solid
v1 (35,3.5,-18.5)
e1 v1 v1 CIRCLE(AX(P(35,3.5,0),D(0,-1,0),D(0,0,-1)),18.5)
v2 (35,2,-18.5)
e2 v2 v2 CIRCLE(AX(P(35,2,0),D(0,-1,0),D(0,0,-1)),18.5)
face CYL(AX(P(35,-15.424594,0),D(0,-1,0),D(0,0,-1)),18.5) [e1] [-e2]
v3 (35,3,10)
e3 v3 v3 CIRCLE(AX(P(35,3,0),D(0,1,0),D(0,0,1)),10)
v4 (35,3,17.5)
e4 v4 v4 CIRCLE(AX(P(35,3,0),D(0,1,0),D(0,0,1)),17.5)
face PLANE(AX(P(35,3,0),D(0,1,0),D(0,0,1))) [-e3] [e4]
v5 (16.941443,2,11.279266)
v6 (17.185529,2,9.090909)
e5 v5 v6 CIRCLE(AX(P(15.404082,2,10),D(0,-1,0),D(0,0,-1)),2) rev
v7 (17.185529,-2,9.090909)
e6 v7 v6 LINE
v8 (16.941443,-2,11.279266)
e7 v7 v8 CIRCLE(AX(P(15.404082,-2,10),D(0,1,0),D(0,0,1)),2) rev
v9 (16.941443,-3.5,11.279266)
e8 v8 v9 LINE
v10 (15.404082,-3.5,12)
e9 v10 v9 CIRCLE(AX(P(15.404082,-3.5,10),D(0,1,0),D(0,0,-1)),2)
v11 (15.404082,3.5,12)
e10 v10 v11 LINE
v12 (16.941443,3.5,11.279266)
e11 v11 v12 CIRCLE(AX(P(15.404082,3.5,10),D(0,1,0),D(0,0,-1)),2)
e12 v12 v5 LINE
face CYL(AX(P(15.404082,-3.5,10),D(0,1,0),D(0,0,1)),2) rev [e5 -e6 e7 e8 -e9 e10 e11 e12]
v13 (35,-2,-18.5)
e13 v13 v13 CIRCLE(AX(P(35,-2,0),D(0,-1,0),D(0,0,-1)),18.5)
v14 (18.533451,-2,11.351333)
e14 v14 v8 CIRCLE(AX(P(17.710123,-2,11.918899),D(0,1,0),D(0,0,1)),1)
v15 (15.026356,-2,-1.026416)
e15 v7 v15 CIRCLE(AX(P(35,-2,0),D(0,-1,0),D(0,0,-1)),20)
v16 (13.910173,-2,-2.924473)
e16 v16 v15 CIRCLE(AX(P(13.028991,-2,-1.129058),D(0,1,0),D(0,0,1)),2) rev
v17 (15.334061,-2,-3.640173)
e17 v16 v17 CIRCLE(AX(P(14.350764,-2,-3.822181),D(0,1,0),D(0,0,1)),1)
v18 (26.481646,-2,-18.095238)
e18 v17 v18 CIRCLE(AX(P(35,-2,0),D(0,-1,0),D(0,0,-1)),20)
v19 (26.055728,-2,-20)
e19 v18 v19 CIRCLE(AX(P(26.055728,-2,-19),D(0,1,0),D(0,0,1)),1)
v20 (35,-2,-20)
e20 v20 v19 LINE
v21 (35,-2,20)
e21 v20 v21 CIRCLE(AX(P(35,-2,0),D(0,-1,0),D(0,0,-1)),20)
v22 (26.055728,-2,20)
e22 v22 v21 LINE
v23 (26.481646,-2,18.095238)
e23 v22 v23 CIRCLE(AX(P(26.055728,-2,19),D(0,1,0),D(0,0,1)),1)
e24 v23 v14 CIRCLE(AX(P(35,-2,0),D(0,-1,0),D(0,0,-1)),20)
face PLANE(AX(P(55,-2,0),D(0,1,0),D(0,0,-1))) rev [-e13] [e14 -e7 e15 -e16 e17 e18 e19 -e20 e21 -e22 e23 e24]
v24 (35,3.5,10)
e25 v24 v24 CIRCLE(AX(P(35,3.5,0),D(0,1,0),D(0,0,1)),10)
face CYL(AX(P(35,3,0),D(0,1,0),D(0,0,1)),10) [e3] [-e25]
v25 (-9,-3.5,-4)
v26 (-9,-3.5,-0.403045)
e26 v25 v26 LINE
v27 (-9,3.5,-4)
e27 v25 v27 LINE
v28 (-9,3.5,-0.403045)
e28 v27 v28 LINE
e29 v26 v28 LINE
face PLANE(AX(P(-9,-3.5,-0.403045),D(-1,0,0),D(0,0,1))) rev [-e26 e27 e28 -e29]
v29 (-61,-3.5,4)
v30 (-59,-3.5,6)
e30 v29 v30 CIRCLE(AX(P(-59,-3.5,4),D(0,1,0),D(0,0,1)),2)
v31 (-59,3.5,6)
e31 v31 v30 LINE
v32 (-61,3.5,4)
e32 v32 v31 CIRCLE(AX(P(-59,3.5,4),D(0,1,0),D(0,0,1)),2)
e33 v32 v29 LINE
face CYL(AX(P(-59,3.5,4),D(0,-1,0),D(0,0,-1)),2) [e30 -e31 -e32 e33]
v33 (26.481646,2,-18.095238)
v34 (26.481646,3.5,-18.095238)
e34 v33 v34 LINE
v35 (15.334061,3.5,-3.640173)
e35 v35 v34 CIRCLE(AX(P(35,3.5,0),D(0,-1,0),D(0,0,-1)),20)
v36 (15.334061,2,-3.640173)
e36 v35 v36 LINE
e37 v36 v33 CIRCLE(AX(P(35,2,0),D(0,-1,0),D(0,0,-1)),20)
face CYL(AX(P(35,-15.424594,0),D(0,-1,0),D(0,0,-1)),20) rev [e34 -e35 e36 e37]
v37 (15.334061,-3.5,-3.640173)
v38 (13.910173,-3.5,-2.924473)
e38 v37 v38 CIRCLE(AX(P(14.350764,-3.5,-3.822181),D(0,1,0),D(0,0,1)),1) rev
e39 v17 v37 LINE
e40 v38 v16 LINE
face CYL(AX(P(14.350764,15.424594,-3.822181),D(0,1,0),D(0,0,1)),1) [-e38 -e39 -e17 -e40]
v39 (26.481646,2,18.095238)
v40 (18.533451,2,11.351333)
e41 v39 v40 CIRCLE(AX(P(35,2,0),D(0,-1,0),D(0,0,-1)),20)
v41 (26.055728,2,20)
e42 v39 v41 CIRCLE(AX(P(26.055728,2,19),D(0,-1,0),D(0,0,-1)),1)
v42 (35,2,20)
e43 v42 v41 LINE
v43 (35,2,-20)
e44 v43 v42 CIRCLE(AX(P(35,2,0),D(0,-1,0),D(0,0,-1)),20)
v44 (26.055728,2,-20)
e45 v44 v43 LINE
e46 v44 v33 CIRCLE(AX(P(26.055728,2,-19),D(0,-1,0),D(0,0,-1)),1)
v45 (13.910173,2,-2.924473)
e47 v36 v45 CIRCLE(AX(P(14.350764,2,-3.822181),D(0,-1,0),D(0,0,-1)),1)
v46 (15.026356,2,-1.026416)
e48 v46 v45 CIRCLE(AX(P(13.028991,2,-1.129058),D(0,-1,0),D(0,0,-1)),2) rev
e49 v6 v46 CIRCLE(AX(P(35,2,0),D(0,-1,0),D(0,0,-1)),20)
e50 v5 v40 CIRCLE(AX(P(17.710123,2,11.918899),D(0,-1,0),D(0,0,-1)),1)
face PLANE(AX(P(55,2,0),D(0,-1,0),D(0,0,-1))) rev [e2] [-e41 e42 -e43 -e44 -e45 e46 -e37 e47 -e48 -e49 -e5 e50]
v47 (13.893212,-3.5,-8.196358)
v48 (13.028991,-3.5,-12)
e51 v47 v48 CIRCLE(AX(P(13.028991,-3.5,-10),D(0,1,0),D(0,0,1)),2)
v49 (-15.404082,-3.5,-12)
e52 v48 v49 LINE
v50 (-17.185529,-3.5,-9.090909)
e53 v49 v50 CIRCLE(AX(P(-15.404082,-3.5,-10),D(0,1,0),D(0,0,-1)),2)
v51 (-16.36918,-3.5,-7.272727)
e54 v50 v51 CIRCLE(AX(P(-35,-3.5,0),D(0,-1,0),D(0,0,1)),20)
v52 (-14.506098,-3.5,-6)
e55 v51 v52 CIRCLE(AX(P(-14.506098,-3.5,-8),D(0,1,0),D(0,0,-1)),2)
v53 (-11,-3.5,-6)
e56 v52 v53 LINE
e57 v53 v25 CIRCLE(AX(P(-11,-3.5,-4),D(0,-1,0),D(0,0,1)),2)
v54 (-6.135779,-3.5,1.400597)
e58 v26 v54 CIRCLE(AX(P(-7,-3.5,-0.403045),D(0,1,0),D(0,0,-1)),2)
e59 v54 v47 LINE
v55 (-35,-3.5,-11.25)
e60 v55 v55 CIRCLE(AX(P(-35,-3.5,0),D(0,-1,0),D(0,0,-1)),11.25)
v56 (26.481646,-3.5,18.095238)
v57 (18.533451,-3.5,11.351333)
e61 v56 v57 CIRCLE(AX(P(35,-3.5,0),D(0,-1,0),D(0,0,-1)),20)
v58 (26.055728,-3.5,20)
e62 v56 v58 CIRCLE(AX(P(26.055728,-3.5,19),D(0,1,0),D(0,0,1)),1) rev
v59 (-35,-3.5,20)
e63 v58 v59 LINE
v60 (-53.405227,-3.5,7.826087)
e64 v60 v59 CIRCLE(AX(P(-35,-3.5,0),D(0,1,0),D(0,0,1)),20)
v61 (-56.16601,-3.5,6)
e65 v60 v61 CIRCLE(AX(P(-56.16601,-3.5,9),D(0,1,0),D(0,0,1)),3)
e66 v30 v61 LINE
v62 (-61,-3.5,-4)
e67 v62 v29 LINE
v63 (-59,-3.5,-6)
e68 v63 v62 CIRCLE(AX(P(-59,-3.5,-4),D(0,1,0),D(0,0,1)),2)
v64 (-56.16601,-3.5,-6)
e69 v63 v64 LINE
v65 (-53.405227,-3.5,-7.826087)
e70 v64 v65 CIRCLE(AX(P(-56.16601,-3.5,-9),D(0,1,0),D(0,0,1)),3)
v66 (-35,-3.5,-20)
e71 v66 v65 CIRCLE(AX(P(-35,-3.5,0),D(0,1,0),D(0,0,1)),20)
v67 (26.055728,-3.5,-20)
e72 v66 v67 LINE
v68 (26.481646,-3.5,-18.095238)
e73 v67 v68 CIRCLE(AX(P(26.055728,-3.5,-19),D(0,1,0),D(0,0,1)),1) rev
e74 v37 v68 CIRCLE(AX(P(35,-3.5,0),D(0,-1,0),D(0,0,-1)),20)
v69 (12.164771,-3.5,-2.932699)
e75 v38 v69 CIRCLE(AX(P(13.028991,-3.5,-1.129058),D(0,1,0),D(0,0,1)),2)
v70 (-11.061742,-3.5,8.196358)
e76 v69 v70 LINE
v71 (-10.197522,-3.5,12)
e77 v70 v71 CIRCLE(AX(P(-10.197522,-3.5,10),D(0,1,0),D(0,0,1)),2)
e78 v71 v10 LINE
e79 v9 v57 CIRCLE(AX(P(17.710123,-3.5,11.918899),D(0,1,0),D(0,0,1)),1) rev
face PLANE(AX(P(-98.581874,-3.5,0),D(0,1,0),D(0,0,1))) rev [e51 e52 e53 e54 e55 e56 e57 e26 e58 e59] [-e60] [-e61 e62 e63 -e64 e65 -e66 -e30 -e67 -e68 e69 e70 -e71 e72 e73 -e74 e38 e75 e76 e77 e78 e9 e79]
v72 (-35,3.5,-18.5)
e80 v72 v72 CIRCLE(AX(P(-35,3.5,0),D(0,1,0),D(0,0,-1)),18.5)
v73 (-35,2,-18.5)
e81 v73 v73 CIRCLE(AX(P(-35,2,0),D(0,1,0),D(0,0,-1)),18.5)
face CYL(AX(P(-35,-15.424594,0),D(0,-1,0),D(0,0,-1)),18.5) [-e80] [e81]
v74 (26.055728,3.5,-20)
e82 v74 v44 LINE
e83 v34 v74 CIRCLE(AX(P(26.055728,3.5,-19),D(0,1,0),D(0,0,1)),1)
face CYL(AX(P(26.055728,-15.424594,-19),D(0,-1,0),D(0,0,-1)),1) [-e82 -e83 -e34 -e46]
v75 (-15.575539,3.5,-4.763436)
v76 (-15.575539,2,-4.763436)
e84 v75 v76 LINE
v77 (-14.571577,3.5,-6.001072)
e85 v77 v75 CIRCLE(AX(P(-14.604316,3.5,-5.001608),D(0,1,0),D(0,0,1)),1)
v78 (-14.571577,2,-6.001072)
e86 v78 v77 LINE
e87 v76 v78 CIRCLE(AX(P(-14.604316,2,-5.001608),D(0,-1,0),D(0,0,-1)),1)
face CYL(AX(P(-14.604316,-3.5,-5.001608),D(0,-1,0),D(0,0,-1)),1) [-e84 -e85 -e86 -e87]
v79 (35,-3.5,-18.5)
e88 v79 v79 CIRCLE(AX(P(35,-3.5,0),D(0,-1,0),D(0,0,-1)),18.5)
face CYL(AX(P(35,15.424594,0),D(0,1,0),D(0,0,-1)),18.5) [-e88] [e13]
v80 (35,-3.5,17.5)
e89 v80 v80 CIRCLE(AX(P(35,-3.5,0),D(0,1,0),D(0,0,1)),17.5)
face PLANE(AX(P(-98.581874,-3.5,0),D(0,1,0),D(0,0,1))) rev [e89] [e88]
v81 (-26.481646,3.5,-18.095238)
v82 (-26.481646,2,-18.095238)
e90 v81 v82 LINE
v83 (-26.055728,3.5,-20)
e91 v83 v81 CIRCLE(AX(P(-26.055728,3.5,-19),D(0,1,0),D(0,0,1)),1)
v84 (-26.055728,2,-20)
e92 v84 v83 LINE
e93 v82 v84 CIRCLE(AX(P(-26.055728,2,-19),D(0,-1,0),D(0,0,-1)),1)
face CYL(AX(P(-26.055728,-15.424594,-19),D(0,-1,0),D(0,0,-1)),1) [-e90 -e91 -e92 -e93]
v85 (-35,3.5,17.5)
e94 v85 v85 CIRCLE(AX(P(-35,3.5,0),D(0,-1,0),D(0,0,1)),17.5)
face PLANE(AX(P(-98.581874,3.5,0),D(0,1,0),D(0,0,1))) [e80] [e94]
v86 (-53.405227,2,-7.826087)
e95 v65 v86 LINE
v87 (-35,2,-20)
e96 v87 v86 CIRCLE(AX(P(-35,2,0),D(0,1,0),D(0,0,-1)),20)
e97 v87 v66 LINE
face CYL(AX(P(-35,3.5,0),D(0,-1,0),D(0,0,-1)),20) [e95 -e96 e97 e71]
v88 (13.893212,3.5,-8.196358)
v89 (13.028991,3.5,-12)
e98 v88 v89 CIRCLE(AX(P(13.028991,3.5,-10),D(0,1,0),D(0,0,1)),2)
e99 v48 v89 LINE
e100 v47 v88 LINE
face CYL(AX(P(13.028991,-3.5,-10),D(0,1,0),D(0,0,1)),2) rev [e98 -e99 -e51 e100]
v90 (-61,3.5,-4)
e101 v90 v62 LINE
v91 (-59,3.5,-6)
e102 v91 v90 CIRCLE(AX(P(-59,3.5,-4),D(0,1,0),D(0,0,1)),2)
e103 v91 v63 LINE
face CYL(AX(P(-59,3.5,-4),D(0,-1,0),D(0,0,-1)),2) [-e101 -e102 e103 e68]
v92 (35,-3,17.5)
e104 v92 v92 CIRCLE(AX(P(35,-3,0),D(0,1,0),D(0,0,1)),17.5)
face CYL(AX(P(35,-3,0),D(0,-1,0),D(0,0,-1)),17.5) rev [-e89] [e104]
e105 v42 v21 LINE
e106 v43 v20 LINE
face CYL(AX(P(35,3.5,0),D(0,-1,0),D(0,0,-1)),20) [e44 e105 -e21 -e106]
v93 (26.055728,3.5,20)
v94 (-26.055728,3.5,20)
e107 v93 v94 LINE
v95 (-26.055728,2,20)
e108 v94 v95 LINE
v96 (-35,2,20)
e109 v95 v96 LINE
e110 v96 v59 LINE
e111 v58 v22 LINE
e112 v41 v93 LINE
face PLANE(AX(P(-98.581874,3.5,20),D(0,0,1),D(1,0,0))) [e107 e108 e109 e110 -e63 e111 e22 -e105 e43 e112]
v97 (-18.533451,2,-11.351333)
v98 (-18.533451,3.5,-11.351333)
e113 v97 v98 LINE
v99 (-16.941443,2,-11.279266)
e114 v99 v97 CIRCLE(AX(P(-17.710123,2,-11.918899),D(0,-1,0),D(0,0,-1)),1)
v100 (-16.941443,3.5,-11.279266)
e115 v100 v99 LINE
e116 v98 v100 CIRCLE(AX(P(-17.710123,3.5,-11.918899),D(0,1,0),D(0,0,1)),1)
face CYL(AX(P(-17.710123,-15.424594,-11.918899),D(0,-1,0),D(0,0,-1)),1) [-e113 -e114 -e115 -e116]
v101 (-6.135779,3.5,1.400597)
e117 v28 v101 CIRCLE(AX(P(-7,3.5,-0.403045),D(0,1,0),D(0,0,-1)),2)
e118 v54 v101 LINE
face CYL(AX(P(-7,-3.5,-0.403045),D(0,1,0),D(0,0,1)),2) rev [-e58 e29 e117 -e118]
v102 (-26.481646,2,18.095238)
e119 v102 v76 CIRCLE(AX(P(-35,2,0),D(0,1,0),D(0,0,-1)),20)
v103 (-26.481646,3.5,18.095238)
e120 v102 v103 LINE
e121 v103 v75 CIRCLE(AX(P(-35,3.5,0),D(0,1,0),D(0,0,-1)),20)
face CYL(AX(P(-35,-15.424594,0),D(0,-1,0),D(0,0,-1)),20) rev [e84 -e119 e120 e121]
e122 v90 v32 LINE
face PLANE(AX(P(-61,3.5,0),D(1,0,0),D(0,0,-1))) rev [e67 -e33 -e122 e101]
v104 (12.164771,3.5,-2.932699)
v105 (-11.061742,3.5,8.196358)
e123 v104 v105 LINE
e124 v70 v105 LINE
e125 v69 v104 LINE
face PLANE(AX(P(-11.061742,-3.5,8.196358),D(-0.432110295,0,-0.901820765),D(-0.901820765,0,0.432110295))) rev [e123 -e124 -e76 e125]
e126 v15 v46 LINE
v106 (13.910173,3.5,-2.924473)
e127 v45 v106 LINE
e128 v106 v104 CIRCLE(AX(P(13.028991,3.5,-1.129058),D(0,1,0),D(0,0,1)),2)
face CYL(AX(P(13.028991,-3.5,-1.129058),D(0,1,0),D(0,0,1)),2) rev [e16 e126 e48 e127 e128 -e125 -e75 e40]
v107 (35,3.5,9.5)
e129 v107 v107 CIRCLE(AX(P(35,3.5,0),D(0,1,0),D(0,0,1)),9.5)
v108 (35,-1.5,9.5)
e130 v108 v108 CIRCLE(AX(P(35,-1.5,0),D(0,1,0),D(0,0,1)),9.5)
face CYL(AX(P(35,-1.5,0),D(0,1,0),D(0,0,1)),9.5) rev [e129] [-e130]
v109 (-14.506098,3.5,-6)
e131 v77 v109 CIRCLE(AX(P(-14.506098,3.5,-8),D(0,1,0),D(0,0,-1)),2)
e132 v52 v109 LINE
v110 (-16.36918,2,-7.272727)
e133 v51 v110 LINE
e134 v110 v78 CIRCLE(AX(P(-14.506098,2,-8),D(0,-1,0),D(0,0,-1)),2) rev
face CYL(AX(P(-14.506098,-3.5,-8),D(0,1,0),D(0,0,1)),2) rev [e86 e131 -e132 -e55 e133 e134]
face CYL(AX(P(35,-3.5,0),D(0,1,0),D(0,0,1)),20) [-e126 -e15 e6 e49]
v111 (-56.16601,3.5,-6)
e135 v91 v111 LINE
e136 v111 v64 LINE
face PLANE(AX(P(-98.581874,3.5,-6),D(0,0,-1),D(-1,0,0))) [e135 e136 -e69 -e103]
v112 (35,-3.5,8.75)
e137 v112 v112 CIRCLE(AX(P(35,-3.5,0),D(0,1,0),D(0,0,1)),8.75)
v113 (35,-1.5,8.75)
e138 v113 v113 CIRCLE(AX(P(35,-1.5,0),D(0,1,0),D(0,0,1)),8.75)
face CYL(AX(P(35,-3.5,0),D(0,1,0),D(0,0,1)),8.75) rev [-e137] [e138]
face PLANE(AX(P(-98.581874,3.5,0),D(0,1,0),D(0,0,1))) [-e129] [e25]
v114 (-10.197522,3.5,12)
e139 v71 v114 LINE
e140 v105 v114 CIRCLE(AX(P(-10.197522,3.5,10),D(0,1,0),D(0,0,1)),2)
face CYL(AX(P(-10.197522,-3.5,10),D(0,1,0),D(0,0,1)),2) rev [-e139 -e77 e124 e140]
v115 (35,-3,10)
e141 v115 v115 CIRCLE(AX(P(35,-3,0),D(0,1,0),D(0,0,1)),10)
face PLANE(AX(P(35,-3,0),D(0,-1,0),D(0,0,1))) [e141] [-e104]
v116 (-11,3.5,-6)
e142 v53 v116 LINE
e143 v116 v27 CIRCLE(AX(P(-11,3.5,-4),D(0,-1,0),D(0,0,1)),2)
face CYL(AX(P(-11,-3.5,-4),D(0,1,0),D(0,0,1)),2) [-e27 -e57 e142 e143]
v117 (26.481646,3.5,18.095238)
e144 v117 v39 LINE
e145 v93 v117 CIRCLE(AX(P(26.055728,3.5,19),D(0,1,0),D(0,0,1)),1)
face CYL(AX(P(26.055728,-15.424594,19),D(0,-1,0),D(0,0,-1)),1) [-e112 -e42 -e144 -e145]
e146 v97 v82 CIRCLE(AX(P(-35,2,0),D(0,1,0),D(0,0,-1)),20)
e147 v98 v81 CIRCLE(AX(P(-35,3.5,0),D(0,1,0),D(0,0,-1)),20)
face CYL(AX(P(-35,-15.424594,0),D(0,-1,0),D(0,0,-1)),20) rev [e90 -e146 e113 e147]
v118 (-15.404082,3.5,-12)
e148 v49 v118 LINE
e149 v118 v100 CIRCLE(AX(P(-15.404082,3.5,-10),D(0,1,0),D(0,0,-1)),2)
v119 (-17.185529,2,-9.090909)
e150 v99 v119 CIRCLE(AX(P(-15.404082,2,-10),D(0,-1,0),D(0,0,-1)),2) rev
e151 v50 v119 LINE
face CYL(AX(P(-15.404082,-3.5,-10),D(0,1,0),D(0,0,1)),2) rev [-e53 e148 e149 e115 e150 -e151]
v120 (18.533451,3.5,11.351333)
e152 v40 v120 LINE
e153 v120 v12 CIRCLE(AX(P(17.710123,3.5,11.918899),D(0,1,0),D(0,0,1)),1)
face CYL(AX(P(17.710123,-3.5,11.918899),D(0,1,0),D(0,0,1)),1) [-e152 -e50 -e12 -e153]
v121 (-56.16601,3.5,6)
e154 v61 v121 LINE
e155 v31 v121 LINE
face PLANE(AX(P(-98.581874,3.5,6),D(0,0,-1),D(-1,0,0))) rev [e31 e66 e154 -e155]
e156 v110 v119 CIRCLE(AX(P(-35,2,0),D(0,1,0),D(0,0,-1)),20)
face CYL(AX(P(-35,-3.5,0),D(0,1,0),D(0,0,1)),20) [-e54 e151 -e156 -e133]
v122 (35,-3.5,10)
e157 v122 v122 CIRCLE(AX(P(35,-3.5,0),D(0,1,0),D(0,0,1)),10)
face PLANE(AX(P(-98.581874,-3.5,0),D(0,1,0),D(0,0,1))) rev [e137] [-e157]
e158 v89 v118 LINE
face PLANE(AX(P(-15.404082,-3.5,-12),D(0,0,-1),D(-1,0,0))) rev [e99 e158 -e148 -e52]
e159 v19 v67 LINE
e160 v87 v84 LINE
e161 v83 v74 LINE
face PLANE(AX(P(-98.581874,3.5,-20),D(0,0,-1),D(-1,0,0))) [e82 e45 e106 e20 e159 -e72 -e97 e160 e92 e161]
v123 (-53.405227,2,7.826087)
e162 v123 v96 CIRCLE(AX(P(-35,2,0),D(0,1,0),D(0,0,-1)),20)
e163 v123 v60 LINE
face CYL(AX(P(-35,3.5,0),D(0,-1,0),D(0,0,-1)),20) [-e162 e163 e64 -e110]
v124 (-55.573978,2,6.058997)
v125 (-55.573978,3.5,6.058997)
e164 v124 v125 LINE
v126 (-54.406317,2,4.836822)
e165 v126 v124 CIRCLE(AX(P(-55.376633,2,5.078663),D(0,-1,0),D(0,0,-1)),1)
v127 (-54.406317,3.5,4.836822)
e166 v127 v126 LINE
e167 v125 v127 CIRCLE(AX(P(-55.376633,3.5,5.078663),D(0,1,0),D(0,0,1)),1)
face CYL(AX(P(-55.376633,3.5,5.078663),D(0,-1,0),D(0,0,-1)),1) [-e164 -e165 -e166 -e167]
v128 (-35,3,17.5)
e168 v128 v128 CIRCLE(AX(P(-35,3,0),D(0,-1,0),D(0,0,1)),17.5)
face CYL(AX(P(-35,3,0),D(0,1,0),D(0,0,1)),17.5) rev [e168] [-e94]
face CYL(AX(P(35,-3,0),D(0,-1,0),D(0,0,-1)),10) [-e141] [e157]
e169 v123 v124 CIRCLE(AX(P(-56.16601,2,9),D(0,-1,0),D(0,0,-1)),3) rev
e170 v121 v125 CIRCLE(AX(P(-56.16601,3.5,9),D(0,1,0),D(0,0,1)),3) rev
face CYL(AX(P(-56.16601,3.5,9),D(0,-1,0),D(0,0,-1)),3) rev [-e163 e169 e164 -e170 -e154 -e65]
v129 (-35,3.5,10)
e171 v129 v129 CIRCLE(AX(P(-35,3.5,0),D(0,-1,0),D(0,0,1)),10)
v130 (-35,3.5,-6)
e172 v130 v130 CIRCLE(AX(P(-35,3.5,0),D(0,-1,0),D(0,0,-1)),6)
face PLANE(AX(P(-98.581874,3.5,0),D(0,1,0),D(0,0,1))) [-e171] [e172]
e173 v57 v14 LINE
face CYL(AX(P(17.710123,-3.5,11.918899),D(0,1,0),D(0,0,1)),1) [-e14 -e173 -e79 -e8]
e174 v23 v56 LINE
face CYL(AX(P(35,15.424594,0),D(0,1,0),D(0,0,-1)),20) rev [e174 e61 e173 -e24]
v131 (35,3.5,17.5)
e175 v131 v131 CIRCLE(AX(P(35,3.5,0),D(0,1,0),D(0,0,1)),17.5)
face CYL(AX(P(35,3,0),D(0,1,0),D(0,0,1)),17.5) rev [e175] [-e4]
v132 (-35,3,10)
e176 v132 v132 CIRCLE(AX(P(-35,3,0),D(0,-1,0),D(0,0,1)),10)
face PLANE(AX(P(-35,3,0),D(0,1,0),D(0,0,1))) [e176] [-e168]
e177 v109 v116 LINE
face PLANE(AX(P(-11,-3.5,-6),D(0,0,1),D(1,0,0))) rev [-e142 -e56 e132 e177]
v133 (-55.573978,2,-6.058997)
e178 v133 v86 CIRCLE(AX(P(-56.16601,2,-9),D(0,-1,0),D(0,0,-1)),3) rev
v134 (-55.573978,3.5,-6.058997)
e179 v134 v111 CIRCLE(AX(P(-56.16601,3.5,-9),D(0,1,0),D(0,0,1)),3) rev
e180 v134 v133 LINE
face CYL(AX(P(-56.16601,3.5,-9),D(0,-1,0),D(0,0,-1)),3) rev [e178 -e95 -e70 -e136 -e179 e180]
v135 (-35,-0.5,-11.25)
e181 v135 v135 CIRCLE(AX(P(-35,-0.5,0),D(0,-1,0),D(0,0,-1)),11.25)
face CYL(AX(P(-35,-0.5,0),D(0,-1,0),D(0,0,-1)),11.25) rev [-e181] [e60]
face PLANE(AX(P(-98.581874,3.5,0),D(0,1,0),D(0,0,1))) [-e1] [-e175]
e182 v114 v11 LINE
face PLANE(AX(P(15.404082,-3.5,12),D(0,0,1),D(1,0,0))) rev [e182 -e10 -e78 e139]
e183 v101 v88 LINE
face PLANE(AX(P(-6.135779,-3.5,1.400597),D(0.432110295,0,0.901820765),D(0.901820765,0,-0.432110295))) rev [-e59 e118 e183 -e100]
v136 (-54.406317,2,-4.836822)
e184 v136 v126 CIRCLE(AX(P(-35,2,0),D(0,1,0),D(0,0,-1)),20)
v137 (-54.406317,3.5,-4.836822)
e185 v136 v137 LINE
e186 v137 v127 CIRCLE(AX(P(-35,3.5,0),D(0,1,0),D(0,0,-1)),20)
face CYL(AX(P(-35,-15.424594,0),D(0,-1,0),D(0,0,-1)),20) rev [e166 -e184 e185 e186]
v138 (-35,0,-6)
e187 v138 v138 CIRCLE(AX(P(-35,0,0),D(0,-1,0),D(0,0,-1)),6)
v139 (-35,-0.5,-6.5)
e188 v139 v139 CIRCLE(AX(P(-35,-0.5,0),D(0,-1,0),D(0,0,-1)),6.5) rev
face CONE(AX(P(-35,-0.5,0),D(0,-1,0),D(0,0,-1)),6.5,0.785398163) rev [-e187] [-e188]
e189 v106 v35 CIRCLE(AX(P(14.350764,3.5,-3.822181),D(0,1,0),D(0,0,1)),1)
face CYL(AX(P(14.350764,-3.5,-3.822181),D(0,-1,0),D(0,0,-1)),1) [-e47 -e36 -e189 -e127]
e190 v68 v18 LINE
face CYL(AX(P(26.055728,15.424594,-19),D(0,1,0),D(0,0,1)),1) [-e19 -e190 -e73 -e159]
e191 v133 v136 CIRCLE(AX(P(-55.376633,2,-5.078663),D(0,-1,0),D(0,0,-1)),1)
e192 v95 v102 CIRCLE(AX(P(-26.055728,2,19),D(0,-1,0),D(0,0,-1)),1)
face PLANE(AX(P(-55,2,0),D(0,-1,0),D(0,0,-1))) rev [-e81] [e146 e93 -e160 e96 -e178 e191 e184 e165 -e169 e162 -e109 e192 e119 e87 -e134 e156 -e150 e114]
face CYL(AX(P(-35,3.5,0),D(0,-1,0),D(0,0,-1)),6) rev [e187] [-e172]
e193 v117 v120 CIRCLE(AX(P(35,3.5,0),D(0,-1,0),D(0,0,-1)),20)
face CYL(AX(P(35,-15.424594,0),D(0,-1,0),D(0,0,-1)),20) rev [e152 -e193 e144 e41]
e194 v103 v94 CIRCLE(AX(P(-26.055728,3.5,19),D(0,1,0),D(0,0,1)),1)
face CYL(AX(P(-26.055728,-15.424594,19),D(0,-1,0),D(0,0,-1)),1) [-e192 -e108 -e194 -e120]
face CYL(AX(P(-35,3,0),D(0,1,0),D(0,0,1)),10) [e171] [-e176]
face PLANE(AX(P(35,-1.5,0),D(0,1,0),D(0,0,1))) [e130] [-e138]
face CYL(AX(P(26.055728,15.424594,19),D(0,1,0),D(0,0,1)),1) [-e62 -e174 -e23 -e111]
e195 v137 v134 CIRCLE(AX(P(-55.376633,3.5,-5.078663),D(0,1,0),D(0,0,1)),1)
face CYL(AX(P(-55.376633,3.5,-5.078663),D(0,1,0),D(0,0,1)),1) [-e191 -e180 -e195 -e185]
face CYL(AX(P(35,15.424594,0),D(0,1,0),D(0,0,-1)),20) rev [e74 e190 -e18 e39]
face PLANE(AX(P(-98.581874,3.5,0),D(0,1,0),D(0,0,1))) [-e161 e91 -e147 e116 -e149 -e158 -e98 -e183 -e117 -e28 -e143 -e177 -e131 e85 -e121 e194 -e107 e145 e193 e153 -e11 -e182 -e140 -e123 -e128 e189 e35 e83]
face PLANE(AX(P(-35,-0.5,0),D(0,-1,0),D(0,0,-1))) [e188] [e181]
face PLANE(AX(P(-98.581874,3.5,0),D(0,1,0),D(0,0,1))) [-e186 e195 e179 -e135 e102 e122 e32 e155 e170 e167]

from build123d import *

# Parameters (mm, degrees)
BOSS_EXTRUDE1_DEPTH = 3.5
CUT_EXTRUDE1_DEPTH  = 65.575537164
SKETCH3_R           = 9.5
CUT_EXTRUDE2_DEPTH  = 5
SKETCH4_R           = 8.75
CUT_EXTRUDE3_DEPTH  = 65.389440128
SKETCH5_R           = 17.5
SKETCH5_R_2         = 10
CUT_EXTRUDE4_DEPTH  = 0.5
SKETCH6_W           = 1.5
SKETCH6_H           = 1.5
FILLET1_START       = 2
FILLET1_DEPTH       = 2
SKETCH7_R           = 6
CUT_EXTRUDE5_DEPTH  = 65.575537164
FILLET2_R           = 3
FILLET3_START       = 2
FILLET3_DEPTH       = 1.5
SKETCH8_R           = 11.25
CUT_EXTRUDE6_DEPTH  = 3
CHAMFER1_SIZE       = 0.5


with BuildPart() as part:
    # Sketch1 → Boss-Extrude1 (new, symmetric)
    with BuildSketch(Plane(origin=(0, 0, 0), x_dir=(1, 0, 0), z_dir=(0, 1, 0))):
        with BuildLine():
            Line((35, -20), (-35, -20))
            ThreePointArc((-35, -20), (-55, 0), (-35, 20))
            Line((-35, 20), (35, 20))
            ThreePointArc((35, 20), (55, 0), (35, -20))
        make_face()
        with BuildLine():
            ThreePointArc((-54.078784028, -6), (-55, 0), (-54.078784028, 6))
            Line((-54.078784028, 6), (-59, 6))
            ThreePointArc((-59, 6), (-60.414213562, 5.414213562), (-61, 4))
            Line((-61, 4), (-61, -4))
            ThreePointArc((-61, -4), (-60.414213562, -5.414213562), (-59, -6))
            Line((-59, -6), (-54.078784028, -6))
        make_face()
    extrude(amount=BOSS_EXTRUDE1_DEPTH, both=True)

    # Sketch2 → Cut-Extrude1 (cut, through all)
    with BuildSketch(Plane(origin=(0, 3.5, 0), x_dir=(1, 0, 0), z_dir=(0, 1, 0))):
        with BuildLine():
            Line((-9, 0.403045012), (-9, 4))
            ThreePointArc((-9, 4), (-9.585786438, 5.414213562), (-11, 6))
            Line((-11, 6), (-14.506098468, 6))
            ThreePointArc((-14.506098468, 6), (-15.634250618, 6.348554352), (-16.369180426, 7.272727273))
            ThreePointArc((-16.369180426, 7.272727273), (-16.754692523, 8.191993351), (-17.185529143, 9.090909091))
            ThreePointArc((-17.185529143, 9.090909091), (-17.109687789, 11.044465936), (-15.404082058, 12))
            Line((-15.404082058, 12), (13.028991175, 12))
            ThreePointArc((13.028991175, 12), (14.979283853, 10.443123537), (13.893211766, 8.196358469))
            Line((13.893211766, 8.196358469), (-6.135779409, -1.400596519))
            ThreePointArc((-6.135779409, -1.400596519), (-8.06572952, -1.289355825), (-9, 0.403045012))
        make_face()
        with BuildLine():
            Line((15.404082058, -12), (-10.197521624, -12))
            ThreePointArc((-10.197521624, -12), (-12.147814303, -10.443123537), (-11.061742215, -8.196358469))
            Line((-11.061742215, -8.196358469), (12.164770585, 2.932699201))
            ThreePointArc((12.164770585, 2.932699201), (14.137811537, 2.793544801), (15.026355614, 1.026416064))
            ThreePointArc((15.026355614, 1.026416064), (15.440463184, -4.174268742), (17.185529143, -9.090909091))
            ThreePointArc((17.185529143, -9.090909091), (17.109687789, -11.044465936), (15.404082058, -12))
        make_face()
    extrude(amount=-CUT_EXTRUDE1_DEPTH, mode=Mode.SUBTRACT)

    # Sketch3 → Cut-Extrude2 (cut)
    with BuildSketch(Plane(origin=(0, 3.5, 0), x_dir=(1, 0, 0), z_dir=(0, 1, 0))):
        with Locations(Location((35, 0, 0), (0, 0, 270))):
            Circle(SKETCH3_R)
    extrude(amount=-CUT_EXTRUDE2_DEPTH, mode=Mode.SUBTRACT)

    # Sketch4 → Cut-Extrude3 (cut, through all)
    with BuildSketch(Plane(origin=(0, -1.5, 0), x_dir=(1, 0, 0), z_dir=(0, 1, 0))):
        with Locations(Location((35, 0, 0), (0, 0, 270))):
            Circle(SKETCH4_R)
    extrude(amount=-CUT_EXTRUDE3_DEPTH, mode=Mode.SUBTRACT)

    # Sketch5 → Cut-Extrude4 (cut)
    with BuildSketch(Plane(origin=(0, 3.5, 0), x_dir=(1, 0, 0), z_dir=(0, 1, 0))):
        with Locations(Location((35, 0, 0), (0, 0, 270))):
            Circle(SKETCH5_R)
        with Locations(Location((35, 0, 0), (0, 0, 270))):
            Circle(SKETCH5_R_2, mode=Mode.SUBTRACT)
    cut_extrude4 = extrude(amount=-CUT_EXTRUDE4_DEPTH, mode=Mode.SUBTRACT)

    # Mirror1: Cut-Extrude4 across plane
    add(cut_extrude4.mirror(Plane.ZX), mode=Mode.SUBTRACT)

    # Sketch6 → Cut-Revolve1 (revolve, cut)
    with BuildSketch(Plane.XY, mode=Mode.PRIVATE) as cut_revolve1_sk:
        with Locations((54.25, 2.75)):
            Rectangle(SKETCH6_W, SKETCH6_H)
    cut_revolve1 = revolve(cut_revolve1_sk.sketch.rotate(Axis((35, -15.42459361, 0), (0, 1, 0)), 90), axis=Axis((35, -15.42459361, 0), (0, 1, 0)), mode=Mode.SUBTRACT)

    # Fillet1: read off the stored shape, not the designer's step
    # Fillet1 outline → Fillet1 (cut)
    with BuildSketch(Plane(origin=(0, 0, 0), x_dir=(1, 0, 0), z_dir=(0, 1, 0)).offset(FILLET1_START)):
        with BuildLine():
            ThreePointArc((35, -20), (30.635642195, -19.518001459), (26.4816458, -18.095238095))
            ThreePointArc((26.4816458, -18.095238095), (27.031628163, -19.21821789), (26.05572809, -20))
            Line((26.05572809, -20), (35, -20))
        make_face()
        with BuildLine():
            ThreePointArc((16.941442804, -11.27926617), (17.755344518, -10.919922264), (18.533450645, -11.351332624))
            ThreePointArc((18.533450645, -11.351332624), (17.82226833, -10.243316586), (17.185529143, -9.090909091))
            ThreePointArc((17.185529143, -9.090909091), (17.391756084, -10.221702427), (16.941442804, -11.27926617))
        make_face()
        with BuildLine():
            ThreePointArc((15.026355614, 1.026416064), (15.13716872, 2.338361293), (15.334061369, 3.640172766))
            ThreePointArc((15.334061369, 3.640172766), (14.799862167, 2.928698763), (13.91017335, 2.924473493))
            ThreePointArc((13.91017335, 2.924473493), (14.752987449, 2.142880559), (15.026355614, 1.026416064))
        make_face()
        with BuildLine():
            ThreePointArc((26.05572809, 20), (27.031628163, 19.21821789), (26.4816458, 18.095238095))
            ThreePointArc((26.4816458, 18.095238095), (30.635642195, 19.518001459), (35, 20))
            Line((35, 20), (26.05572809, 20))
        make_face()
    fillet1 = extrude(amount=FILLET1_DEPTH, mode=Mode.SUBTRACT)

    # Mirror2: Cut-Revolve1, Fillet1 across plane
    add(cut_revolve1.mirror(Plane.ZX), mode=Mode.SUBTRACT)
    add(fillet1.mirror(Plane.ZX), mode=Mode.SUBTRACT)

    # Sketch7 → Cut-Extrude5 (cut, through all)
    with BuildSketch(Plane.XZ.offset(3.5)):
        with Locations(Location((-35, 0, 0), (0, 0, 270))):
            Circle(SKETCH7_R)
    extrude(amount=-CUT_EXTRUDE5_DEPTH, mode=Mode.SUBTRACT)

    # Fillet2
    fillet2_edges = [part.edges().sort_by_distance(p)[0] for p in [
        (-54.078784028, 0, 6),
        (-54.078784028, 0, -6),
    ]]
    fillet(fillet2_edges, radius=FILLET2_R)

    # Mirror3: Cut-Extrude4, Cut-Revolve1 across plane
    add(cut_extrude4.mirror(Plane(origin=(0, 0, 0), x_dir=(0, 0, 1), z_dir=(1, 0, 0))), mode=Mode.SUBTRACT)
    add(cut_revolve1.mirror(Plane(origin=(0, 0, 0), x_dir=(0, 0, 1), z_dir=(1, 0, 0))), mode=Mode.SUBTRACT)

    # Fillet3: read off the stored shape, not the designer's step
    # Fillet3 outline → Fillet3 (cut)
    with BuildSketch(Plane(origin=(0, 0, 0), x_dir=(1, 0, 0), z_dir=(0, 1, 0)).offset(FILLET3_START)):
        with BuildLine():
            ThreePointArc((-53.405226512, -7.826086957), (-53.964760447, -6.351209427), (-54.40631736, -4.836821944))
            ThreePointArc((-54.40631736, -4.836821944), (-54.653584548, -5.769460122), (-55.573977543, -6.058997281))
            ThreePointArc((-55.573977543, -6.058997281), (-54.271017927, -6.67427362), (-53.405226512, -7.826086957))
        make_face()
        with BuildLine():
            ThreePointArc((-55.573977543, 6.058997281), (-54.653584548, 5.769460122), (-54.40631736, 4.836821944))
            ThreePointArc((-54.40631736, 4.836821944), (-53.964760447, 6.351209427), (-53.405226512, 7.826086957))
            ThreePointArc((-53.405226512, 7.826086957), (-54.271017927, 6.67427362), (-55.573977543, 6.058997281))
        make_face()
        with BuildLine():
            Line((-35, -20), (-26.05572809, -20))
            ThreePointArc((-26.05572809, -20), (-27.031628163, -19.21821789), (-26.4816458, -18.095238095))
            ThreePointArc((-26.4816458, -18.095238095), (-30.635642195, -19.518001459), (-35, -20))
        make_face()
        with BuildLine():
            ThreePointArc((-16.369180426, 7.272727273), (-15.93104029, 6.031150433), (-15.575539296, 4.7634364))
            ThreePointArc((-15.575539296, 4.7634364), (-15.380926528, 5.631589563), (-14.571576996, 6.001072147))
            ThreePointArc((-14.571576996, 6.001072147), (-15.661136596, 6.367245602), (-16.369180426, 7.272727273))
        make_face()
        with BuildLine():
            ThreePointArc((-17.185529143, 9.090909091), (-17.391756084, 10.221702427), (-16.941442805, 11.279266171))
            ThreePointArc((-16.941442805, 11.279266171), (-17.755344518, 10.919922264), (-18.533450645, 11.351332624))
            ThreePointArc((-18.533450645, 11.351332624), (-17.82226833, 10.243316586), (-17.185529143, 9.090909091))
        make_face()
        with BuildLine():
            ThreePointArc((-35, 20), (-30.635642195, 19.518001459), (-26.4816458, 18.095238095))
            ThreePointArc((-26.4816458, 18.095238095), (-27.031628163, 19.21821789), (-26.05572809, 20))
            Line((-26.05572809, 20), (-35, 20))
        make_face()
    extrude(amount=FILLET3_DEPTH, mode=Mode.SUBTRACT)

    # Sketch8 → Cut-Extrude6 (cut)
    with BuildSketch(Plane.XZ.offset(3.5)):
        with Locations(Location((-35, 0, 0), (0, 0, 270))):
            Circle(SKETCH8_R)
    extrude(amount=-CUT_EXTRUDE6_DEPTH, mode=Mode.SUBTRACT)

    # Chamfer1
    chamfer1_edges = [part.edges().sort_by_distance(p)[0] for p in [
        (-35, -0.5, 6),
    ]]
    chamfer(chamfer1_edges, length=CHAMFER1_SIZE)


solid = part.part
